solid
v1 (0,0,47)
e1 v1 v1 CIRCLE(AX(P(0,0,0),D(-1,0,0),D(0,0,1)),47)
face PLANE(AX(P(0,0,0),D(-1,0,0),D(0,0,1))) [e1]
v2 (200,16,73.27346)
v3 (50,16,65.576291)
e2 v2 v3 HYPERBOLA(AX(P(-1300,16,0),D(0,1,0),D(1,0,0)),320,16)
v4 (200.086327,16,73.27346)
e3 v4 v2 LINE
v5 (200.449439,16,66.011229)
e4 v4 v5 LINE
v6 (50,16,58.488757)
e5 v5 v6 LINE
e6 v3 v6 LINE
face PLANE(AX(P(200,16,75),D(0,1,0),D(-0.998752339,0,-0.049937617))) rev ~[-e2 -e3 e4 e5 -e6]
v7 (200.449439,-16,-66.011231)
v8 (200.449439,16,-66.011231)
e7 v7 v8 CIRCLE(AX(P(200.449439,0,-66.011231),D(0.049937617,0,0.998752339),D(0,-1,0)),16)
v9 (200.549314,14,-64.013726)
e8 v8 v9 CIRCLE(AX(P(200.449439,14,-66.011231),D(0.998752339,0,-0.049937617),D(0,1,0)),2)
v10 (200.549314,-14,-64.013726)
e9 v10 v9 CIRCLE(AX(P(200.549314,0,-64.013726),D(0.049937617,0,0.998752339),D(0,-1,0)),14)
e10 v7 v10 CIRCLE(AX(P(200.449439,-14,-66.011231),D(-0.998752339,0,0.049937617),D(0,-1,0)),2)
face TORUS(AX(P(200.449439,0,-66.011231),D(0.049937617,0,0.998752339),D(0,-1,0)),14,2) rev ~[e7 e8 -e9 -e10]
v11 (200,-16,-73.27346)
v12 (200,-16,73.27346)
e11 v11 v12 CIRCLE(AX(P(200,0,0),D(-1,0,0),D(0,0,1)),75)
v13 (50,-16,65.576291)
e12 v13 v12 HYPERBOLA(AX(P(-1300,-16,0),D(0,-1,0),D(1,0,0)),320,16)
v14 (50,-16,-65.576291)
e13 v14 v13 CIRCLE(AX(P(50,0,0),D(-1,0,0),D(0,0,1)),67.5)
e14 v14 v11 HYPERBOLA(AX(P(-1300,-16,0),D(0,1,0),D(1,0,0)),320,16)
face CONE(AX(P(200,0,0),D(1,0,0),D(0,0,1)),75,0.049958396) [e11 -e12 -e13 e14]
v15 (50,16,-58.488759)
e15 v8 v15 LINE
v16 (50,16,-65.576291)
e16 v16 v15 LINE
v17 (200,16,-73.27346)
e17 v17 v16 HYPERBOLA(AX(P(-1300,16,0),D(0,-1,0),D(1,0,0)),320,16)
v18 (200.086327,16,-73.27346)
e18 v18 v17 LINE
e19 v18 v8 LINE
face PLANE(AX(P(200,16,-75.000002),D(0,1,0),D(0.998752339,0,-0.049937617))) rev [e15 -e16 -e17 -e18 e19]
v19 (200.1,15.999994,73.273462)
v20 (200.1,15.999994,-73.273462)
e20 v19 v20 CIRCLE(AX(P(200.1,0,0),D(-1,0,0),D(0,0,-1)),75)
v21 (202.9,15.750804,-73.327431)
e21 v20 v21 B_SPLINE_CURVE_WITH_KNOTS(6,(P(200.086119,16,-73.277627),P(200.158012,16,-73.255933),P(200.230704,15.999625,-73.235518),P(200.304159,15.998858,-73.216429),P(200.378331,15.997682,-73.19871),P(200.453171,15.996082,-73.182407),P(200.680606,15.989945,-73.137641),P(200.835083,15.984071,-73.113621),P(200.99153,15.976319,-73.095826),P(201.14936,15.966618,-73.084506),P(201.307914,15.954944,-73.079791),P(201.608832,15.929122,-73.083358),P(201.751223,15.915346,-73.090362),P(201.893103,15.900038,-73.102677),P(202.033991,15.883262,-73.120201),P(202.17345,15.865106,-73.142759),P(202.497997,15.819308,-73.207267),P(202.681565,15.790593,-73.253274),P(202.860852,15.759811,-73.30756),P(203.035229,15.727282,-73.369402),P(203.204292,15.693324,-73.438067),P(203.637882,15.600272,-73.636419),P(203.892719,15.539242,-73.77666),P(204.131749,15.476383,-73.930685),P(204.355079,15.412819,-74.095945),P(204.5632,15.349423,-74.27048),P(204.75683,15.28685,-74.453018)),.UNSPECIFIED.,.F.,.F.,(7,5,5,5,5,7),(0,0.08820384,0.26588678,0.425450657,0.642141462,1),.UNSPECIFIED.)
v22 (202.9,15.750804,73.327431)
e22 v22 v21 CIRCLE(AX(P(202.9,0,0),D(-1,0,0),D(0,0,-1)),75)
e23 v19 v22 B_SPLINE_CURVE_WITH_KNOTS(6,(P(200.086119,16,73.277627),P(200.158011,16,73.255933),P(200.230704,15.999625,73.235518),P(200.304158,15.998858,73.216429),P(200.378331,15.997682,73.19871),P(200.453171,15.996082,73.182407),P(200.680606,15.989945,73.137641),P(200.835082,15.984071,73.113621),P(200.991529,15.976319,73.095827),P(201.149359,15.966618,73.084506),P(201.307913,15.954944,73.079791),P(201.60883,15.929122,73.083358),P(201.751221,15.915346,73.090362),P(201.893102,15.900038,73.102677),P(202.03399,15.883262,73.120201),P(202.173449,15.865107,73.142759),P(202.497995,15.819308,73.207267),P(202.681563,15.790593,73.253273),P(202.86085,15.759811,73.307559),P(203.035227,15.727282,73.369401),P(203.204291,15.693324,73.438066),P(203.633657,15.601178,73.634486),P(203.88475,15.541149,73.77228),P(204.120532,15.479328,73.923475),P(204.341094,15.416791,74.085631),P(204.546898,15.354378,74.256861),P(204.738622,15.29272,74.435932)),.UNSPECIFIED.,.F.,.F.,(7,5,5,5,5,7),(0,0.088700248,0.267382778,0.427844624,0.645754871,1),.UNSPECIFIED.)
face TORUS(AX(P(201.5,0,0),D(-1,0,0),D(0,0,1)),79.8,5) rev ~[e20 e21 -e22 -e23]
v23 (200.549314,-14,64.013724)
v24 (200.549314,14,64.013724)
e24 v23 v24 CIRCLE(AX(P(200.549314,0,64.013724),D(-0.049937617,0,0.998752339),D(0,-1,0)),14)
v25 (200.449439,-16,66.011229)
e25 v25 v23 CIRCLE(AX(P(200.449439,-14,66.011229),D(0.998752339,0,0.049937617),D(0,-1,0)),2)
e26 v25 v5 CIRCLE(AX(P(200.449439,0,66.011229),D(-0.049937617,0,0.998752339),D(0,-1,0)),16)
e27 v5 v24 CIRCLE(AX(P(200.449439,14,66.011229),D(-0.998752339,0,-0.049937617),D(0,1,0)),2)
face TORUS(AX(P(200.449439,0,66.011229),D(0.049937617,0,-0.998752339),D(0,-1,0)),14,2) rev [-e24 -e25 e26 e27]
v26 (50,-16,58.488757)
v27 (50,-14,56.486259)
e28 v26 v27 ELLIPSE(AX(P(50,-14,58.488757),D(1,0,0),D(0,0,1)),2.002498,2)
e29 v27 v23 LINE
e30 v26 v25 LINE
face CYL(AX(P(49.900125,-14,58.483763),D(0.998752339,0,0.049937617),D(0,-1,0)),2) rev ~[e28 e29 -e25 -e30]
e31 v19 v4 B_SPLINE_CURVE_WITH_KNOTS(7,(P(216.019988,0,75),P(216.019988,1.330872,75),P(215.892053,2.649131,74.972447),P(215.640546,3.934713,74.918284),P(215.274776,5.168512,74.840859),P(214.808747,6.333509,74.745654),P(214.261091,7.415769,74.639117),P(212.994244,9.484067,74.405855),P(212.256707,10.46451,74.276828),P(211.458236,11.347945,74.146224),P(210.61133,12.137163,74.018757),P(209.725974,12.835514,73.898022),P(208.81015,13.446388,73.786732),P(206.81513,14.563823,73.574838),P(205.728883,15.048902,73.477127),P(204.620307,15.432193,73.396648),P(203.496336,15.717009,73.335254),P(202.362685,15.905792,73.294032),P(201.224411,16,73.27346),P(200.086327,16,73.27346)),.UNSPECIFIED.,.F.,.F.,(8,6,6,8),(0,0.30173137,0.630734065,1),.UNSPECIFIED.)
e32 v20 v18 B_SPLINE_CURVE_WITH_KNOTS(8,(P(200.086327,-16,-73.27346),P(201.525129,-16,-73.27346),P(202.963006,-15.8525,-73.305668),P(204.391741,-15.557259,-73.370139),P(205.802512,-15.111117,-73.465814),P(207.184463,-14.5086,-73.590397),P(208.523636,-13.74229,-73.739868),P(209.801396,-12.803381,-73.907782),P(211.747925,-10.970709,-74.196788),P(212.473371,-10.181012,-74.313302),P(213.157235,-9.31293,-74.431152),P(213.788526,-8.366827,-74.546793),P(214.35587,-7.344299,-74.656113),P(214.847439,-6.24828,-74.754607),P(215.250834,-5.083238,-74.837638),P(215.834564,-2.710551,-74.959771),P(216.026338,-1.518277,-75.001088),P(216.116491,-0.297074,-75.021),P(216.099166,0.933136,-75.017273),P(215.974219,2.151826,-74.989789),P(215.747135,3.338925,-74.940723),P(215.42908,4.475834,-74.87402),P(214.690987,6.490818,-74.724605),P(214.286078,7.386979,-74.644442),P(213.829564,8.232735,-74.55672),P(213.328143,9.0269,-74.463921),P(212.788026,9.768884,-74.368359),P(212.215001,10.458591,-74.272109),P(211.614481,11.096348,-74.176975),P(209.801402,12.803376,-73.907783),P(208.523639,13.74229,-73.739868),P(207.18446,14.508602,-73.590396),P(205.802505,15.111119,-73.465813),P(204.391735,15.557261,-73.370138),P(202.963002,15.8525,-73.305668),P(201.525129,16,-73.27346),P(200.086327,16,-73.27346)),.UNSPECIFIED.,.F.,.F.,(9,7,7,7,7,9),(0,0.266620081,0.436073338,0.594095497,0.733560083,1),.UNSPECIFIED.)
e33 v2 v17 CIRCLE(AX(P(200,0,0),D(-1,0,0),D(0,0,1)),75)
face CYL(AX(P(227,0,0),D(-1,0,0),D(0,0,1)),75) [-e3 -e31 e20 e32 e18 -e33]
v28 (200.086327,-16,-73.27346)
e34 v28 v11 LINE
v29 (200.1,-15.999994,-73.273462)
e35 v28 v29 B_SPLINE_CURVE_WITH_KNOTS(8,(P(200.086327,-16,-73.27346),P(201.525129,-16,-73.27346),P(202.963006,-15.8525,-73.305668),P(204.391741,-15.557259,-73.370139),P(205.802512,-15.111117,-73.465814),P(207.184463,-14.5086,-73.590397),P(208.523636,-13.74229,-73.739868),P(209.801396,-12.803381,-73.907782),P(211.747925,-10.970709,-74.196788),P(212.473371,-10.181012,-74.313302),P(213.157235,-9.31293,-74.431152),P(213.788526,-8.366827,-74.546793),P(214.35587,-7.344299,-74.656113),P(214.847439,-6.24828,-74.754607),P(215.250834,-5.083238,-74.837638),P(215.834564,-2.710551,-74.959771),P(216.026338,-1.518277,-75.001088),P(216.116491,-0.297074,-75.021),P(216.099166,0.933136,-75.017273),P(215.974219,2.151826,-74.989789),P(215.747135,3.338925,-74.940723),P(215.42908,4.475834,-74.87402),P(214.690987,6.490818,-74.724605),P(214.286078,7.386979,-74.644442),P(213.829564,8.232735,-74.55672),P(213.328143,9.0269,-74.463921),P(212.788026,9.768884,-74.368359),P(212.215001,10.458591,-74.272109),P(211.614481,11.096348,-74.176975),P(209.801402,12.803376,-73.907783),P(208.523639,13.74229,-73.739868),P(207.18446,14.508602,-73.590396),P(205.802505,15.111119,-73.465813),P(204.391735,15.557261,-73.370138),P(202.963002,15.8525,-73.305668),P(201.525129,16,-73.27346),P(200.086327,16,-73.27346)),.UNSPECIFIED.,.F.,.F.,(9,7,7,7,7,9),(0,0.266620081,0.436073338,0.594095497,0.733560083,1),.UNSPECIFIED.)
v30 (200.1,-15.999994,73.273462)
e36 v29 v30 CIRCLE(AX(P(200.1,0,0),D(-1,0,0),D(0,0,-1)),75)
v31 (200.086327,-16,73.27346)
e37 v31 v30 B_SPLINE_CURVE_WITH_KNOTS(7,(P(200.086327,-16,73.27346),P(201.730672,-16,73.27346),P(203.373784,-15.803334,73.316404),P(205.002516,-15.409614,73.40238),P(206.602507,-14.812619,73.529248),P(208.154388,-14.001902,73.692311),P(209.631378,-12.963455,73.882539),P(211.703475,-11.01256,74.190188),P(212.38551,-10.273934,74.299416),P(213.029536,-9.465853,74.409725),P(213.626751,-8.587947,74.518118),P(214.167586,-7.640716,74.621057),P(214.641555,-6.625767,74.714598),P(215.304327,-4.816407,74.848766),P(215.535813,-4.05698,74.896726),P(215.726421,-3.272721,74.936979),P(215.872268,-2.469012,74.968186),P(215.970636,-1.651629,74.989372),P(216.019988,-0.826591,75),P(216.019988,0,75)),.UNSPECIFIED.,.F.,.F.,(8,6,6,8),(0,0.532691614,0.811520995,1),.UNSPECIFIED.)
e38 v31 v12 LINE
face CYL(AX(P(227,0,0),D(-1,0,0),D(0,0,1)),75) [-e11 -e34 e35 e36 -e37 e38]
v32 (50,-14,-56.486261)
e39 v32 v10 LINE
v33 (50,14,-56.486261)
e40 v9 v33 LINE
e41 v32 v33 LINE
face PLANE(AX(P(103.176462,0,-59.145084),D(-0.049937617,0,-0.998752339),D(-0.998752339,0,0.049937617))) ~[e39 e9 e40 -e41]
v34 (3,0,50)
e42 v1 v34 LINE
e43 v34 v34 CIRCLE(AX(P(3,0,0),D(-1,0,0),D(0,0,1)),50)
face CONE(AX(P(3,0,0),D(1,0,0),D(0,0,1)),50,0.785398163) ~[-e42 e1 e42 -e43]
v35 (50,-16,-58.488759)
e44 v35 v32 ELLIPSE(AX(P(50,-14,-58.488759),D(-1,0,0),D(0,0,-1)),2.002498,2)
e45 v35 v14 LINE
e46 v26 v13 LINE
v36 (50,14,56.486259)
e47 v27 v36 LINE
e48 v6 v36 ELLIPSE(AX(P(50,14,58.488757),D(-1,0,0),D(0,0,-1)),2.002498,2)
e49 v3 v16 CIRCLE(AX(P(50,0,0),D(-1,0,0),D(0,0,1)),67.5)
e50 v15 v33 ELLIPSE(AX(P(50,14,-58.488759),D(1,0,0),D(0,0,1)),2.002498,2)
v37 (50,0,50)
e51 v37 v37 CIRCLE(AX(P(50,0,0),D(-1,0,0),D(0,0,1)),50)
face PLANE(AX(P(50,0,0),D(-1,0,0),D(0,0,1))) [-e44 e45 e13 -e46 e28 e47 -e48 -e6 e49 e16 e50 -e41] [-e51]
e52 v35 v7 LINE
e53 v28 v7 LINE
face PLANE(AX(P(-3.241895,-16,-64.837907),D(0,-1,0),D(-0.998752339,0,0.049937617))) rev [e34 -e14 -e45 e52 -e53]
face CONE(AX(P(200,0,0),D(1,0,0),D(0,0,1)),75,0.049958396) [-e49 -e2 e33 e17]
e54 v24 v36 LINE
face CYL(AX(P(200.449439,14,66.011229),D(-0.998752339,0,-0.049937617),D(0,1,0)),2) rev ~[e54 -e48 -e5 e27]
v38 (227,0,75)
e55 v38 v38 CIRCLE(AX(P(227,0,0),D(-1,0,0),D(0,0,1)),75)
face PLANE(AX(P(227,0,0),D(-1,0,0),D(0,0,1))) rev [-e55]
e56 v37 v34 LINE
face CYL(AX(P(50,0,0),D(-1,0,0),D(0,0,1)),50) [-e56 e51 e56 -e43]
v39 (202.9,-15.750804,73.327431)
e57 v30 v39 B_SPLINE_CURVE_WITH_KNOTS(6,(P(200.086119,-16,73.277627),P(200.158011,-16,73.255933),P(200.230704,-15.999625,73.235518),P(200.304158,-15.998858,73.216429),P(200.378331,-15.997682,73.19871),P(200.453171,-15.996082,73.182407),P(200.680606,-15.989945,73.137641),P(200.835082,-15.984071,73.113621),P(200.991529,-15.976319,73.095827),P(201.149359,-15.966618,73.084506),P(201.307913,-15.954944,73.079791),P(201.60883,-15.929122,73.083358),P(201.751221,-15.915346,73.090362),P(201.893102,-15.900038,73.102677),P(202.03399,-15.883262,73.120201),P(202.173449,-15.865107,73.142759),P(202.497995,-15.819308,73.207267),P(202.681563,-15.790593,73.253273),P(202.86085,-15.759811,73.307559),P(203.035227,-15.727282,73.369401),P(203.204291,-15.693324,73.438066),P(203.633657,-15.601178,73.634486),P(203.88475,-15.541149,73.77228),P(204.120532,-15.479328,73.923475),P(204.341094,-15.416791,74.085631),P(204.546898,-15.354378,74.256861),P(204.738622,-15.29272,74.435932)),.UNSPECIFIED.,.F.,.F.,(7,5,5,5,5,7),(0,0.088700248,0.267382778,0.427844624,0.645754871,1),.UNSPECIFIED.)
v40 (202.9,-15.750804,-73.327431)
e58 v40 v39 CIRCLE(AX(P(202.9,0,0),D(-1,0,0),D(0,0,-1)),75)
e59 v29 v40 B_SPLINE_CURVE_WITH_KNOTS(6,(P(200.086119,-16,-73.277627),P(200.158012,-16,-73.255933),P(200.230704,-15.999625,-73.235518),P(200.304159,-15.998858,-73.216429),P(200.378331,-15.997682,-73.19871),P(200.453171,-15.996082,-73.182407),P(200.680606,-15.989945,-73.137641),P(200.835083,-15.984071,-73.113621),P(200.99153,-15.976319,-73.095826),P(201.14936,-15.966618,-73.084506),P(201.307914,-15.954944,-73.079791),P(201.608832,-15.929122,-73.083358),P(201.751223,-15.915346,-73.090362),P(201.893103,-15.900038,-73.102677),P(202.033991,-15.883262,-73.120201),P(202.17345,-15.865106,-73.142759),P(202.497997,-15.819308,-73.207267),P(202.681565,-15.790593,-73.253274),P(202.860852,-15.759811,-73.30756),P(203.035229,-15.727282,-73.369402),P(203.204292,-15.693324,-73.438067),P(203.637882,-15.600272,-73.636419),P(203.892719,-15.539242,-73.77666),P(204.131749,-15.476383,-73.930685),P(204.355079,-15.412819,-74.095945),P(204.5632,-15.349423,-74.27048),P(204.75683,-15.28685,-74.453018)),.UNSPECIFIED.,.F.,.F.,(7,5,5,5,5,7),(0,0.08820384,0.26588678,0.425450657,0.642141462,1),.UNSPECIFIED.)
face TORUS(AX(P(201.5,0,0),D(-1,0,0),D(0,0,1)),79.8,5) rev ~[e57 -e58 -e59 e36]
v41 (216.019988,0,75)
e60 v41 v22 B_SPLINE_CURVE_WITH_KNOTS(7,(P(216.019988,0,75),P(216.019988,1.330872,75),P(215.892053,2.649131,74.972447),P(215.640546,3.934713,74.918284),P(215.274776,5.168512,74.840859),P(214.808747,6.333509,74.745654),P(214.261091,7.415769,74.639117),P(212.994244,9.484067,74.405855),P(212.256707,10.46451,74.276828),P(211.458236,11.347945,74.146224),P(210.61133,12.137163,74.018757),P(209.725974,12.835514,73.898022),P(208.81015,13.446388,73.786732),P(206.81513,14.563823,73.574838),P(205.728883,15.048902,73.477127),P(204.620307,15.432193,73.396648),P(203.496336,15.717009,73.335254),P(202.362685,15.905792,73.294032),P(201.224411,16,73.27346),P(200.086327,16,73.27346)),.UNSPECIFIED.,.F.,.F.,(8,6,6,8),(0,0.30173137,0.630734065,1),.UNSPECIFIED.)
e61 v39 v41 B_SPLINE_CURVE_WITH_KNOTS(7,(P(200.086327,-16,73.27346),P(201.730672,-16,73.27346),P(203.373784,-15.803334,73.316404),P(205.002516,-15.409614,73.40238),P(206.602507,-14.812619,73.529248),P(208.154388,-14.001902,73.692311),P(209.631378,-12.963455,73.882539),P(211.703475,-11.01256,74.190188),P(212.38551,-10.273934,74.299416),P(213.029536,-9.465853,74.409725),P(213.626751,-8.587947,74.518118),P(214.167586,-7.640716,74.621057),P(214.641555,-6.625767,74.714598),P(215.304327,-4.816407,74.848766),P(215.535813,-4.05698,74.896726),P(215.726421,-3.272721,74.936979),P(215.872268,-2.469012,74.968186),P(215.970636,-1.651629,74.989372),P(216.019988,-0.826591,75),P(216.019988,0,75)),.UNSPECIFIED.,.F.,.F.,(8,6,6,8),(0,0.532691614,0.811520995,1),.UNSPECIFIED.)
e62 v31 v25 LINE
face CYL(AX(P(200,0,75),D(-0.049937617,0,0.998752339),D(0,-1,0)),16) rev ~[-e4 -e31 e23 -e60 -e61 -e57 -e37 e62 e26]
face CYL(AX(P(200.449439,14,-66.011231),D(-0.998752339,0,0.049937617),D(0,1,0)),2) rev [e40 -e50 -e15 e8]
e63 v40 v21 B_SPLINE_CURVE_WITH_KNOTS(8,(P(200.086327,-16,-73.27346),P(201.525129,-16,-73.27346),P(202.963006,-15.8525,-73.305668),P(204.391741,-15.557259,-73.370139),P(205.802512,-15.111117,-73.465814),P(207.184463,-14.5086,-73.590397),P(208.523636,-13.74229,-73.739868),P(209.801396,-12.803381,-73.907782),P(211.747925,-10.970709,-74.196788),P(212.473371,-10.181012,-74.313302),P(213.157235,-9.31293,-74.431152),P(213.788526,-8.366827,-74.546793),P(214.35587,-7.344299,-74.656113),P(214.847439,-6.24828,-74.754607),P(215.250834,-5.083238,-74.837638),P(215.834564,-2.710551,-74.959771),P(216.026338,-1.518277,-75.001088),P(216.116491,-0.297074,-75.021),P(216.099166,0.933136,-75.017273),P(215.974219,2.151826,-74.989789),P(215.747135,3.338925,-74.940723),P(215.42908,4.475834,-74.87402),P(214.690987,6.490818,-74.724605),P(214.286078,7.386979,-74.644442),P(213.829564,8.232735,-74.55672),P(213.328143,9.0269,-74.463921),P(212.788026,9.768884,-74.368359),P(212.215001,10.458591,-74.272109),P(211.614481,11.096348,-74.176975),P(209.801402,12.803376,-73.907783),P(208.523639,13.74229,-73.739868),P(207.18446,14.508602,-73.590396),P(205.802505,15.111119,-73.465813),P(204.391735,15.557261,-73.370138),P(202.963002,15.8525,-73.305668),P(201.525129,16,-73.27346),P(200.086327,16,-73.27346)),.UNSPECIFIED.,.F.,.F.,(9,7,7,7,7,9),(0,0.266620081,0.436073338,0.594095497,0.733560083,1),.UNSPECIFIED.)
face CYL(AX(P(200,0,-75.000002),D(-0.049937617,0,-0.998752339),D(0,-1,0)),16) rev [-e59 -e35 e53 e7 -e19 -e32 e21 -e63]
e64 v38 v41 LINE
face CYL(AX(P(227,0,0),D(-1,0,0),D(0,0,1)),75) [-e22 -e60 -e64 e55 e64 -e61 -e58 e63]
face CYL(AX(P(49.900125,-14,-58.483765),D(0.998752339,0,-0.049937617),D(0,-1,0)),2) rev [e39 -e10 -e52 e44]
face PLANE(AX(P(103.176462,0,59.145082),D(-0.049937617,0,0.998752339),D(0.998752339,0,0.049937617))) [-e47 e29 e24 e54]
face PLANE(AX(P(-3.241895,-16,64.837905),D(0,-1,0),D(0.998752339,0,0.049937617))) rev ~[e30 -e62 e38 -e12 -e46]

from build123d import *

# Parameters (mm, degrees)
F4_DEPTH = 11
F5_R     = 5
F7_SIZE  = 3
F8_R     = 2


# Not quite as in the source:
# - a pattern or mirror of a feature is missing from the dataset's text; its kind, count and spacing are read off the source's solid


with BuildPart() as f1:
    # F0 (on Front) → F1 (revolve)
    with BuildSketch(Plane.XZ):
        Polygon((0, 50), (0, 0), (227, 0), (227, 75), (200, 75), (50, 67.5), (50, 50), align=None)
    revolve(axis=Axis((113.5, 0, 0), (-1, 0, 0)))

    # F3 (on line) → F4 (cut)
    with BuildSketch(Plane(origin=(-3.2418952618, 0, 64.8379052369), x_dir=(0.9987523389, 0, 0.0499376169), z_dir=(-0.0499376169, 0, 0.9987523389))):
        with BuildLine():
            Line((0, 16), (0, -16))
            Line((0, -16), (203.4957890464, -16))
            ThreePointArc((203.4957890464, -16), (219.4957890464, 0), (203.4957890464, 16))
            Line((203.4957890464, 16), (0, 16))
        make_face()
    f4 = extrude(amount=-F4_DEPTH, mode=Mode.SUBTRACT)

    # F4_copies: F4 across plane
    add(f4.mirror(Plane(origin=(0, 0, -1e-06), x_dir=(-1, 0, 0), z_dir=(0, 0, -1))), mode=Mode.SUBTRACT)

    # F5 (on Front) → F6 (revolve, cut)
    with BuildSketch(Plane.XZ):
        with Locations((201.5, 79.8)):
            Circle(F5_R)
    revolve(axis=Axis((113.5, 0, 0), (-1, 0, 0)), mode=Mode.SUBTRACT)

    # F7
    f7_edges = [f1.edges().sort_by_distance(p)[0] for p in [
        (0, 0, -50),
    ]]
    chamfer(f7_edges, length=F7_SIZE)

    # F8
    f8_edges = [f1.edges().sort_by_distance(p)[0] for p in [
        (125.274657, 16, 60.249991),
        (216.529351, 0, 64.812726),
        (125.274657, -16, 60.249991),
        (125.274657, -16, -60.249993),
        (216.529351, 0, -64.812728),
        (125.274657, 16, -60.249993),
    ]]
    fillet(f8_edges, radius=F8_R)


solid = f1.part
